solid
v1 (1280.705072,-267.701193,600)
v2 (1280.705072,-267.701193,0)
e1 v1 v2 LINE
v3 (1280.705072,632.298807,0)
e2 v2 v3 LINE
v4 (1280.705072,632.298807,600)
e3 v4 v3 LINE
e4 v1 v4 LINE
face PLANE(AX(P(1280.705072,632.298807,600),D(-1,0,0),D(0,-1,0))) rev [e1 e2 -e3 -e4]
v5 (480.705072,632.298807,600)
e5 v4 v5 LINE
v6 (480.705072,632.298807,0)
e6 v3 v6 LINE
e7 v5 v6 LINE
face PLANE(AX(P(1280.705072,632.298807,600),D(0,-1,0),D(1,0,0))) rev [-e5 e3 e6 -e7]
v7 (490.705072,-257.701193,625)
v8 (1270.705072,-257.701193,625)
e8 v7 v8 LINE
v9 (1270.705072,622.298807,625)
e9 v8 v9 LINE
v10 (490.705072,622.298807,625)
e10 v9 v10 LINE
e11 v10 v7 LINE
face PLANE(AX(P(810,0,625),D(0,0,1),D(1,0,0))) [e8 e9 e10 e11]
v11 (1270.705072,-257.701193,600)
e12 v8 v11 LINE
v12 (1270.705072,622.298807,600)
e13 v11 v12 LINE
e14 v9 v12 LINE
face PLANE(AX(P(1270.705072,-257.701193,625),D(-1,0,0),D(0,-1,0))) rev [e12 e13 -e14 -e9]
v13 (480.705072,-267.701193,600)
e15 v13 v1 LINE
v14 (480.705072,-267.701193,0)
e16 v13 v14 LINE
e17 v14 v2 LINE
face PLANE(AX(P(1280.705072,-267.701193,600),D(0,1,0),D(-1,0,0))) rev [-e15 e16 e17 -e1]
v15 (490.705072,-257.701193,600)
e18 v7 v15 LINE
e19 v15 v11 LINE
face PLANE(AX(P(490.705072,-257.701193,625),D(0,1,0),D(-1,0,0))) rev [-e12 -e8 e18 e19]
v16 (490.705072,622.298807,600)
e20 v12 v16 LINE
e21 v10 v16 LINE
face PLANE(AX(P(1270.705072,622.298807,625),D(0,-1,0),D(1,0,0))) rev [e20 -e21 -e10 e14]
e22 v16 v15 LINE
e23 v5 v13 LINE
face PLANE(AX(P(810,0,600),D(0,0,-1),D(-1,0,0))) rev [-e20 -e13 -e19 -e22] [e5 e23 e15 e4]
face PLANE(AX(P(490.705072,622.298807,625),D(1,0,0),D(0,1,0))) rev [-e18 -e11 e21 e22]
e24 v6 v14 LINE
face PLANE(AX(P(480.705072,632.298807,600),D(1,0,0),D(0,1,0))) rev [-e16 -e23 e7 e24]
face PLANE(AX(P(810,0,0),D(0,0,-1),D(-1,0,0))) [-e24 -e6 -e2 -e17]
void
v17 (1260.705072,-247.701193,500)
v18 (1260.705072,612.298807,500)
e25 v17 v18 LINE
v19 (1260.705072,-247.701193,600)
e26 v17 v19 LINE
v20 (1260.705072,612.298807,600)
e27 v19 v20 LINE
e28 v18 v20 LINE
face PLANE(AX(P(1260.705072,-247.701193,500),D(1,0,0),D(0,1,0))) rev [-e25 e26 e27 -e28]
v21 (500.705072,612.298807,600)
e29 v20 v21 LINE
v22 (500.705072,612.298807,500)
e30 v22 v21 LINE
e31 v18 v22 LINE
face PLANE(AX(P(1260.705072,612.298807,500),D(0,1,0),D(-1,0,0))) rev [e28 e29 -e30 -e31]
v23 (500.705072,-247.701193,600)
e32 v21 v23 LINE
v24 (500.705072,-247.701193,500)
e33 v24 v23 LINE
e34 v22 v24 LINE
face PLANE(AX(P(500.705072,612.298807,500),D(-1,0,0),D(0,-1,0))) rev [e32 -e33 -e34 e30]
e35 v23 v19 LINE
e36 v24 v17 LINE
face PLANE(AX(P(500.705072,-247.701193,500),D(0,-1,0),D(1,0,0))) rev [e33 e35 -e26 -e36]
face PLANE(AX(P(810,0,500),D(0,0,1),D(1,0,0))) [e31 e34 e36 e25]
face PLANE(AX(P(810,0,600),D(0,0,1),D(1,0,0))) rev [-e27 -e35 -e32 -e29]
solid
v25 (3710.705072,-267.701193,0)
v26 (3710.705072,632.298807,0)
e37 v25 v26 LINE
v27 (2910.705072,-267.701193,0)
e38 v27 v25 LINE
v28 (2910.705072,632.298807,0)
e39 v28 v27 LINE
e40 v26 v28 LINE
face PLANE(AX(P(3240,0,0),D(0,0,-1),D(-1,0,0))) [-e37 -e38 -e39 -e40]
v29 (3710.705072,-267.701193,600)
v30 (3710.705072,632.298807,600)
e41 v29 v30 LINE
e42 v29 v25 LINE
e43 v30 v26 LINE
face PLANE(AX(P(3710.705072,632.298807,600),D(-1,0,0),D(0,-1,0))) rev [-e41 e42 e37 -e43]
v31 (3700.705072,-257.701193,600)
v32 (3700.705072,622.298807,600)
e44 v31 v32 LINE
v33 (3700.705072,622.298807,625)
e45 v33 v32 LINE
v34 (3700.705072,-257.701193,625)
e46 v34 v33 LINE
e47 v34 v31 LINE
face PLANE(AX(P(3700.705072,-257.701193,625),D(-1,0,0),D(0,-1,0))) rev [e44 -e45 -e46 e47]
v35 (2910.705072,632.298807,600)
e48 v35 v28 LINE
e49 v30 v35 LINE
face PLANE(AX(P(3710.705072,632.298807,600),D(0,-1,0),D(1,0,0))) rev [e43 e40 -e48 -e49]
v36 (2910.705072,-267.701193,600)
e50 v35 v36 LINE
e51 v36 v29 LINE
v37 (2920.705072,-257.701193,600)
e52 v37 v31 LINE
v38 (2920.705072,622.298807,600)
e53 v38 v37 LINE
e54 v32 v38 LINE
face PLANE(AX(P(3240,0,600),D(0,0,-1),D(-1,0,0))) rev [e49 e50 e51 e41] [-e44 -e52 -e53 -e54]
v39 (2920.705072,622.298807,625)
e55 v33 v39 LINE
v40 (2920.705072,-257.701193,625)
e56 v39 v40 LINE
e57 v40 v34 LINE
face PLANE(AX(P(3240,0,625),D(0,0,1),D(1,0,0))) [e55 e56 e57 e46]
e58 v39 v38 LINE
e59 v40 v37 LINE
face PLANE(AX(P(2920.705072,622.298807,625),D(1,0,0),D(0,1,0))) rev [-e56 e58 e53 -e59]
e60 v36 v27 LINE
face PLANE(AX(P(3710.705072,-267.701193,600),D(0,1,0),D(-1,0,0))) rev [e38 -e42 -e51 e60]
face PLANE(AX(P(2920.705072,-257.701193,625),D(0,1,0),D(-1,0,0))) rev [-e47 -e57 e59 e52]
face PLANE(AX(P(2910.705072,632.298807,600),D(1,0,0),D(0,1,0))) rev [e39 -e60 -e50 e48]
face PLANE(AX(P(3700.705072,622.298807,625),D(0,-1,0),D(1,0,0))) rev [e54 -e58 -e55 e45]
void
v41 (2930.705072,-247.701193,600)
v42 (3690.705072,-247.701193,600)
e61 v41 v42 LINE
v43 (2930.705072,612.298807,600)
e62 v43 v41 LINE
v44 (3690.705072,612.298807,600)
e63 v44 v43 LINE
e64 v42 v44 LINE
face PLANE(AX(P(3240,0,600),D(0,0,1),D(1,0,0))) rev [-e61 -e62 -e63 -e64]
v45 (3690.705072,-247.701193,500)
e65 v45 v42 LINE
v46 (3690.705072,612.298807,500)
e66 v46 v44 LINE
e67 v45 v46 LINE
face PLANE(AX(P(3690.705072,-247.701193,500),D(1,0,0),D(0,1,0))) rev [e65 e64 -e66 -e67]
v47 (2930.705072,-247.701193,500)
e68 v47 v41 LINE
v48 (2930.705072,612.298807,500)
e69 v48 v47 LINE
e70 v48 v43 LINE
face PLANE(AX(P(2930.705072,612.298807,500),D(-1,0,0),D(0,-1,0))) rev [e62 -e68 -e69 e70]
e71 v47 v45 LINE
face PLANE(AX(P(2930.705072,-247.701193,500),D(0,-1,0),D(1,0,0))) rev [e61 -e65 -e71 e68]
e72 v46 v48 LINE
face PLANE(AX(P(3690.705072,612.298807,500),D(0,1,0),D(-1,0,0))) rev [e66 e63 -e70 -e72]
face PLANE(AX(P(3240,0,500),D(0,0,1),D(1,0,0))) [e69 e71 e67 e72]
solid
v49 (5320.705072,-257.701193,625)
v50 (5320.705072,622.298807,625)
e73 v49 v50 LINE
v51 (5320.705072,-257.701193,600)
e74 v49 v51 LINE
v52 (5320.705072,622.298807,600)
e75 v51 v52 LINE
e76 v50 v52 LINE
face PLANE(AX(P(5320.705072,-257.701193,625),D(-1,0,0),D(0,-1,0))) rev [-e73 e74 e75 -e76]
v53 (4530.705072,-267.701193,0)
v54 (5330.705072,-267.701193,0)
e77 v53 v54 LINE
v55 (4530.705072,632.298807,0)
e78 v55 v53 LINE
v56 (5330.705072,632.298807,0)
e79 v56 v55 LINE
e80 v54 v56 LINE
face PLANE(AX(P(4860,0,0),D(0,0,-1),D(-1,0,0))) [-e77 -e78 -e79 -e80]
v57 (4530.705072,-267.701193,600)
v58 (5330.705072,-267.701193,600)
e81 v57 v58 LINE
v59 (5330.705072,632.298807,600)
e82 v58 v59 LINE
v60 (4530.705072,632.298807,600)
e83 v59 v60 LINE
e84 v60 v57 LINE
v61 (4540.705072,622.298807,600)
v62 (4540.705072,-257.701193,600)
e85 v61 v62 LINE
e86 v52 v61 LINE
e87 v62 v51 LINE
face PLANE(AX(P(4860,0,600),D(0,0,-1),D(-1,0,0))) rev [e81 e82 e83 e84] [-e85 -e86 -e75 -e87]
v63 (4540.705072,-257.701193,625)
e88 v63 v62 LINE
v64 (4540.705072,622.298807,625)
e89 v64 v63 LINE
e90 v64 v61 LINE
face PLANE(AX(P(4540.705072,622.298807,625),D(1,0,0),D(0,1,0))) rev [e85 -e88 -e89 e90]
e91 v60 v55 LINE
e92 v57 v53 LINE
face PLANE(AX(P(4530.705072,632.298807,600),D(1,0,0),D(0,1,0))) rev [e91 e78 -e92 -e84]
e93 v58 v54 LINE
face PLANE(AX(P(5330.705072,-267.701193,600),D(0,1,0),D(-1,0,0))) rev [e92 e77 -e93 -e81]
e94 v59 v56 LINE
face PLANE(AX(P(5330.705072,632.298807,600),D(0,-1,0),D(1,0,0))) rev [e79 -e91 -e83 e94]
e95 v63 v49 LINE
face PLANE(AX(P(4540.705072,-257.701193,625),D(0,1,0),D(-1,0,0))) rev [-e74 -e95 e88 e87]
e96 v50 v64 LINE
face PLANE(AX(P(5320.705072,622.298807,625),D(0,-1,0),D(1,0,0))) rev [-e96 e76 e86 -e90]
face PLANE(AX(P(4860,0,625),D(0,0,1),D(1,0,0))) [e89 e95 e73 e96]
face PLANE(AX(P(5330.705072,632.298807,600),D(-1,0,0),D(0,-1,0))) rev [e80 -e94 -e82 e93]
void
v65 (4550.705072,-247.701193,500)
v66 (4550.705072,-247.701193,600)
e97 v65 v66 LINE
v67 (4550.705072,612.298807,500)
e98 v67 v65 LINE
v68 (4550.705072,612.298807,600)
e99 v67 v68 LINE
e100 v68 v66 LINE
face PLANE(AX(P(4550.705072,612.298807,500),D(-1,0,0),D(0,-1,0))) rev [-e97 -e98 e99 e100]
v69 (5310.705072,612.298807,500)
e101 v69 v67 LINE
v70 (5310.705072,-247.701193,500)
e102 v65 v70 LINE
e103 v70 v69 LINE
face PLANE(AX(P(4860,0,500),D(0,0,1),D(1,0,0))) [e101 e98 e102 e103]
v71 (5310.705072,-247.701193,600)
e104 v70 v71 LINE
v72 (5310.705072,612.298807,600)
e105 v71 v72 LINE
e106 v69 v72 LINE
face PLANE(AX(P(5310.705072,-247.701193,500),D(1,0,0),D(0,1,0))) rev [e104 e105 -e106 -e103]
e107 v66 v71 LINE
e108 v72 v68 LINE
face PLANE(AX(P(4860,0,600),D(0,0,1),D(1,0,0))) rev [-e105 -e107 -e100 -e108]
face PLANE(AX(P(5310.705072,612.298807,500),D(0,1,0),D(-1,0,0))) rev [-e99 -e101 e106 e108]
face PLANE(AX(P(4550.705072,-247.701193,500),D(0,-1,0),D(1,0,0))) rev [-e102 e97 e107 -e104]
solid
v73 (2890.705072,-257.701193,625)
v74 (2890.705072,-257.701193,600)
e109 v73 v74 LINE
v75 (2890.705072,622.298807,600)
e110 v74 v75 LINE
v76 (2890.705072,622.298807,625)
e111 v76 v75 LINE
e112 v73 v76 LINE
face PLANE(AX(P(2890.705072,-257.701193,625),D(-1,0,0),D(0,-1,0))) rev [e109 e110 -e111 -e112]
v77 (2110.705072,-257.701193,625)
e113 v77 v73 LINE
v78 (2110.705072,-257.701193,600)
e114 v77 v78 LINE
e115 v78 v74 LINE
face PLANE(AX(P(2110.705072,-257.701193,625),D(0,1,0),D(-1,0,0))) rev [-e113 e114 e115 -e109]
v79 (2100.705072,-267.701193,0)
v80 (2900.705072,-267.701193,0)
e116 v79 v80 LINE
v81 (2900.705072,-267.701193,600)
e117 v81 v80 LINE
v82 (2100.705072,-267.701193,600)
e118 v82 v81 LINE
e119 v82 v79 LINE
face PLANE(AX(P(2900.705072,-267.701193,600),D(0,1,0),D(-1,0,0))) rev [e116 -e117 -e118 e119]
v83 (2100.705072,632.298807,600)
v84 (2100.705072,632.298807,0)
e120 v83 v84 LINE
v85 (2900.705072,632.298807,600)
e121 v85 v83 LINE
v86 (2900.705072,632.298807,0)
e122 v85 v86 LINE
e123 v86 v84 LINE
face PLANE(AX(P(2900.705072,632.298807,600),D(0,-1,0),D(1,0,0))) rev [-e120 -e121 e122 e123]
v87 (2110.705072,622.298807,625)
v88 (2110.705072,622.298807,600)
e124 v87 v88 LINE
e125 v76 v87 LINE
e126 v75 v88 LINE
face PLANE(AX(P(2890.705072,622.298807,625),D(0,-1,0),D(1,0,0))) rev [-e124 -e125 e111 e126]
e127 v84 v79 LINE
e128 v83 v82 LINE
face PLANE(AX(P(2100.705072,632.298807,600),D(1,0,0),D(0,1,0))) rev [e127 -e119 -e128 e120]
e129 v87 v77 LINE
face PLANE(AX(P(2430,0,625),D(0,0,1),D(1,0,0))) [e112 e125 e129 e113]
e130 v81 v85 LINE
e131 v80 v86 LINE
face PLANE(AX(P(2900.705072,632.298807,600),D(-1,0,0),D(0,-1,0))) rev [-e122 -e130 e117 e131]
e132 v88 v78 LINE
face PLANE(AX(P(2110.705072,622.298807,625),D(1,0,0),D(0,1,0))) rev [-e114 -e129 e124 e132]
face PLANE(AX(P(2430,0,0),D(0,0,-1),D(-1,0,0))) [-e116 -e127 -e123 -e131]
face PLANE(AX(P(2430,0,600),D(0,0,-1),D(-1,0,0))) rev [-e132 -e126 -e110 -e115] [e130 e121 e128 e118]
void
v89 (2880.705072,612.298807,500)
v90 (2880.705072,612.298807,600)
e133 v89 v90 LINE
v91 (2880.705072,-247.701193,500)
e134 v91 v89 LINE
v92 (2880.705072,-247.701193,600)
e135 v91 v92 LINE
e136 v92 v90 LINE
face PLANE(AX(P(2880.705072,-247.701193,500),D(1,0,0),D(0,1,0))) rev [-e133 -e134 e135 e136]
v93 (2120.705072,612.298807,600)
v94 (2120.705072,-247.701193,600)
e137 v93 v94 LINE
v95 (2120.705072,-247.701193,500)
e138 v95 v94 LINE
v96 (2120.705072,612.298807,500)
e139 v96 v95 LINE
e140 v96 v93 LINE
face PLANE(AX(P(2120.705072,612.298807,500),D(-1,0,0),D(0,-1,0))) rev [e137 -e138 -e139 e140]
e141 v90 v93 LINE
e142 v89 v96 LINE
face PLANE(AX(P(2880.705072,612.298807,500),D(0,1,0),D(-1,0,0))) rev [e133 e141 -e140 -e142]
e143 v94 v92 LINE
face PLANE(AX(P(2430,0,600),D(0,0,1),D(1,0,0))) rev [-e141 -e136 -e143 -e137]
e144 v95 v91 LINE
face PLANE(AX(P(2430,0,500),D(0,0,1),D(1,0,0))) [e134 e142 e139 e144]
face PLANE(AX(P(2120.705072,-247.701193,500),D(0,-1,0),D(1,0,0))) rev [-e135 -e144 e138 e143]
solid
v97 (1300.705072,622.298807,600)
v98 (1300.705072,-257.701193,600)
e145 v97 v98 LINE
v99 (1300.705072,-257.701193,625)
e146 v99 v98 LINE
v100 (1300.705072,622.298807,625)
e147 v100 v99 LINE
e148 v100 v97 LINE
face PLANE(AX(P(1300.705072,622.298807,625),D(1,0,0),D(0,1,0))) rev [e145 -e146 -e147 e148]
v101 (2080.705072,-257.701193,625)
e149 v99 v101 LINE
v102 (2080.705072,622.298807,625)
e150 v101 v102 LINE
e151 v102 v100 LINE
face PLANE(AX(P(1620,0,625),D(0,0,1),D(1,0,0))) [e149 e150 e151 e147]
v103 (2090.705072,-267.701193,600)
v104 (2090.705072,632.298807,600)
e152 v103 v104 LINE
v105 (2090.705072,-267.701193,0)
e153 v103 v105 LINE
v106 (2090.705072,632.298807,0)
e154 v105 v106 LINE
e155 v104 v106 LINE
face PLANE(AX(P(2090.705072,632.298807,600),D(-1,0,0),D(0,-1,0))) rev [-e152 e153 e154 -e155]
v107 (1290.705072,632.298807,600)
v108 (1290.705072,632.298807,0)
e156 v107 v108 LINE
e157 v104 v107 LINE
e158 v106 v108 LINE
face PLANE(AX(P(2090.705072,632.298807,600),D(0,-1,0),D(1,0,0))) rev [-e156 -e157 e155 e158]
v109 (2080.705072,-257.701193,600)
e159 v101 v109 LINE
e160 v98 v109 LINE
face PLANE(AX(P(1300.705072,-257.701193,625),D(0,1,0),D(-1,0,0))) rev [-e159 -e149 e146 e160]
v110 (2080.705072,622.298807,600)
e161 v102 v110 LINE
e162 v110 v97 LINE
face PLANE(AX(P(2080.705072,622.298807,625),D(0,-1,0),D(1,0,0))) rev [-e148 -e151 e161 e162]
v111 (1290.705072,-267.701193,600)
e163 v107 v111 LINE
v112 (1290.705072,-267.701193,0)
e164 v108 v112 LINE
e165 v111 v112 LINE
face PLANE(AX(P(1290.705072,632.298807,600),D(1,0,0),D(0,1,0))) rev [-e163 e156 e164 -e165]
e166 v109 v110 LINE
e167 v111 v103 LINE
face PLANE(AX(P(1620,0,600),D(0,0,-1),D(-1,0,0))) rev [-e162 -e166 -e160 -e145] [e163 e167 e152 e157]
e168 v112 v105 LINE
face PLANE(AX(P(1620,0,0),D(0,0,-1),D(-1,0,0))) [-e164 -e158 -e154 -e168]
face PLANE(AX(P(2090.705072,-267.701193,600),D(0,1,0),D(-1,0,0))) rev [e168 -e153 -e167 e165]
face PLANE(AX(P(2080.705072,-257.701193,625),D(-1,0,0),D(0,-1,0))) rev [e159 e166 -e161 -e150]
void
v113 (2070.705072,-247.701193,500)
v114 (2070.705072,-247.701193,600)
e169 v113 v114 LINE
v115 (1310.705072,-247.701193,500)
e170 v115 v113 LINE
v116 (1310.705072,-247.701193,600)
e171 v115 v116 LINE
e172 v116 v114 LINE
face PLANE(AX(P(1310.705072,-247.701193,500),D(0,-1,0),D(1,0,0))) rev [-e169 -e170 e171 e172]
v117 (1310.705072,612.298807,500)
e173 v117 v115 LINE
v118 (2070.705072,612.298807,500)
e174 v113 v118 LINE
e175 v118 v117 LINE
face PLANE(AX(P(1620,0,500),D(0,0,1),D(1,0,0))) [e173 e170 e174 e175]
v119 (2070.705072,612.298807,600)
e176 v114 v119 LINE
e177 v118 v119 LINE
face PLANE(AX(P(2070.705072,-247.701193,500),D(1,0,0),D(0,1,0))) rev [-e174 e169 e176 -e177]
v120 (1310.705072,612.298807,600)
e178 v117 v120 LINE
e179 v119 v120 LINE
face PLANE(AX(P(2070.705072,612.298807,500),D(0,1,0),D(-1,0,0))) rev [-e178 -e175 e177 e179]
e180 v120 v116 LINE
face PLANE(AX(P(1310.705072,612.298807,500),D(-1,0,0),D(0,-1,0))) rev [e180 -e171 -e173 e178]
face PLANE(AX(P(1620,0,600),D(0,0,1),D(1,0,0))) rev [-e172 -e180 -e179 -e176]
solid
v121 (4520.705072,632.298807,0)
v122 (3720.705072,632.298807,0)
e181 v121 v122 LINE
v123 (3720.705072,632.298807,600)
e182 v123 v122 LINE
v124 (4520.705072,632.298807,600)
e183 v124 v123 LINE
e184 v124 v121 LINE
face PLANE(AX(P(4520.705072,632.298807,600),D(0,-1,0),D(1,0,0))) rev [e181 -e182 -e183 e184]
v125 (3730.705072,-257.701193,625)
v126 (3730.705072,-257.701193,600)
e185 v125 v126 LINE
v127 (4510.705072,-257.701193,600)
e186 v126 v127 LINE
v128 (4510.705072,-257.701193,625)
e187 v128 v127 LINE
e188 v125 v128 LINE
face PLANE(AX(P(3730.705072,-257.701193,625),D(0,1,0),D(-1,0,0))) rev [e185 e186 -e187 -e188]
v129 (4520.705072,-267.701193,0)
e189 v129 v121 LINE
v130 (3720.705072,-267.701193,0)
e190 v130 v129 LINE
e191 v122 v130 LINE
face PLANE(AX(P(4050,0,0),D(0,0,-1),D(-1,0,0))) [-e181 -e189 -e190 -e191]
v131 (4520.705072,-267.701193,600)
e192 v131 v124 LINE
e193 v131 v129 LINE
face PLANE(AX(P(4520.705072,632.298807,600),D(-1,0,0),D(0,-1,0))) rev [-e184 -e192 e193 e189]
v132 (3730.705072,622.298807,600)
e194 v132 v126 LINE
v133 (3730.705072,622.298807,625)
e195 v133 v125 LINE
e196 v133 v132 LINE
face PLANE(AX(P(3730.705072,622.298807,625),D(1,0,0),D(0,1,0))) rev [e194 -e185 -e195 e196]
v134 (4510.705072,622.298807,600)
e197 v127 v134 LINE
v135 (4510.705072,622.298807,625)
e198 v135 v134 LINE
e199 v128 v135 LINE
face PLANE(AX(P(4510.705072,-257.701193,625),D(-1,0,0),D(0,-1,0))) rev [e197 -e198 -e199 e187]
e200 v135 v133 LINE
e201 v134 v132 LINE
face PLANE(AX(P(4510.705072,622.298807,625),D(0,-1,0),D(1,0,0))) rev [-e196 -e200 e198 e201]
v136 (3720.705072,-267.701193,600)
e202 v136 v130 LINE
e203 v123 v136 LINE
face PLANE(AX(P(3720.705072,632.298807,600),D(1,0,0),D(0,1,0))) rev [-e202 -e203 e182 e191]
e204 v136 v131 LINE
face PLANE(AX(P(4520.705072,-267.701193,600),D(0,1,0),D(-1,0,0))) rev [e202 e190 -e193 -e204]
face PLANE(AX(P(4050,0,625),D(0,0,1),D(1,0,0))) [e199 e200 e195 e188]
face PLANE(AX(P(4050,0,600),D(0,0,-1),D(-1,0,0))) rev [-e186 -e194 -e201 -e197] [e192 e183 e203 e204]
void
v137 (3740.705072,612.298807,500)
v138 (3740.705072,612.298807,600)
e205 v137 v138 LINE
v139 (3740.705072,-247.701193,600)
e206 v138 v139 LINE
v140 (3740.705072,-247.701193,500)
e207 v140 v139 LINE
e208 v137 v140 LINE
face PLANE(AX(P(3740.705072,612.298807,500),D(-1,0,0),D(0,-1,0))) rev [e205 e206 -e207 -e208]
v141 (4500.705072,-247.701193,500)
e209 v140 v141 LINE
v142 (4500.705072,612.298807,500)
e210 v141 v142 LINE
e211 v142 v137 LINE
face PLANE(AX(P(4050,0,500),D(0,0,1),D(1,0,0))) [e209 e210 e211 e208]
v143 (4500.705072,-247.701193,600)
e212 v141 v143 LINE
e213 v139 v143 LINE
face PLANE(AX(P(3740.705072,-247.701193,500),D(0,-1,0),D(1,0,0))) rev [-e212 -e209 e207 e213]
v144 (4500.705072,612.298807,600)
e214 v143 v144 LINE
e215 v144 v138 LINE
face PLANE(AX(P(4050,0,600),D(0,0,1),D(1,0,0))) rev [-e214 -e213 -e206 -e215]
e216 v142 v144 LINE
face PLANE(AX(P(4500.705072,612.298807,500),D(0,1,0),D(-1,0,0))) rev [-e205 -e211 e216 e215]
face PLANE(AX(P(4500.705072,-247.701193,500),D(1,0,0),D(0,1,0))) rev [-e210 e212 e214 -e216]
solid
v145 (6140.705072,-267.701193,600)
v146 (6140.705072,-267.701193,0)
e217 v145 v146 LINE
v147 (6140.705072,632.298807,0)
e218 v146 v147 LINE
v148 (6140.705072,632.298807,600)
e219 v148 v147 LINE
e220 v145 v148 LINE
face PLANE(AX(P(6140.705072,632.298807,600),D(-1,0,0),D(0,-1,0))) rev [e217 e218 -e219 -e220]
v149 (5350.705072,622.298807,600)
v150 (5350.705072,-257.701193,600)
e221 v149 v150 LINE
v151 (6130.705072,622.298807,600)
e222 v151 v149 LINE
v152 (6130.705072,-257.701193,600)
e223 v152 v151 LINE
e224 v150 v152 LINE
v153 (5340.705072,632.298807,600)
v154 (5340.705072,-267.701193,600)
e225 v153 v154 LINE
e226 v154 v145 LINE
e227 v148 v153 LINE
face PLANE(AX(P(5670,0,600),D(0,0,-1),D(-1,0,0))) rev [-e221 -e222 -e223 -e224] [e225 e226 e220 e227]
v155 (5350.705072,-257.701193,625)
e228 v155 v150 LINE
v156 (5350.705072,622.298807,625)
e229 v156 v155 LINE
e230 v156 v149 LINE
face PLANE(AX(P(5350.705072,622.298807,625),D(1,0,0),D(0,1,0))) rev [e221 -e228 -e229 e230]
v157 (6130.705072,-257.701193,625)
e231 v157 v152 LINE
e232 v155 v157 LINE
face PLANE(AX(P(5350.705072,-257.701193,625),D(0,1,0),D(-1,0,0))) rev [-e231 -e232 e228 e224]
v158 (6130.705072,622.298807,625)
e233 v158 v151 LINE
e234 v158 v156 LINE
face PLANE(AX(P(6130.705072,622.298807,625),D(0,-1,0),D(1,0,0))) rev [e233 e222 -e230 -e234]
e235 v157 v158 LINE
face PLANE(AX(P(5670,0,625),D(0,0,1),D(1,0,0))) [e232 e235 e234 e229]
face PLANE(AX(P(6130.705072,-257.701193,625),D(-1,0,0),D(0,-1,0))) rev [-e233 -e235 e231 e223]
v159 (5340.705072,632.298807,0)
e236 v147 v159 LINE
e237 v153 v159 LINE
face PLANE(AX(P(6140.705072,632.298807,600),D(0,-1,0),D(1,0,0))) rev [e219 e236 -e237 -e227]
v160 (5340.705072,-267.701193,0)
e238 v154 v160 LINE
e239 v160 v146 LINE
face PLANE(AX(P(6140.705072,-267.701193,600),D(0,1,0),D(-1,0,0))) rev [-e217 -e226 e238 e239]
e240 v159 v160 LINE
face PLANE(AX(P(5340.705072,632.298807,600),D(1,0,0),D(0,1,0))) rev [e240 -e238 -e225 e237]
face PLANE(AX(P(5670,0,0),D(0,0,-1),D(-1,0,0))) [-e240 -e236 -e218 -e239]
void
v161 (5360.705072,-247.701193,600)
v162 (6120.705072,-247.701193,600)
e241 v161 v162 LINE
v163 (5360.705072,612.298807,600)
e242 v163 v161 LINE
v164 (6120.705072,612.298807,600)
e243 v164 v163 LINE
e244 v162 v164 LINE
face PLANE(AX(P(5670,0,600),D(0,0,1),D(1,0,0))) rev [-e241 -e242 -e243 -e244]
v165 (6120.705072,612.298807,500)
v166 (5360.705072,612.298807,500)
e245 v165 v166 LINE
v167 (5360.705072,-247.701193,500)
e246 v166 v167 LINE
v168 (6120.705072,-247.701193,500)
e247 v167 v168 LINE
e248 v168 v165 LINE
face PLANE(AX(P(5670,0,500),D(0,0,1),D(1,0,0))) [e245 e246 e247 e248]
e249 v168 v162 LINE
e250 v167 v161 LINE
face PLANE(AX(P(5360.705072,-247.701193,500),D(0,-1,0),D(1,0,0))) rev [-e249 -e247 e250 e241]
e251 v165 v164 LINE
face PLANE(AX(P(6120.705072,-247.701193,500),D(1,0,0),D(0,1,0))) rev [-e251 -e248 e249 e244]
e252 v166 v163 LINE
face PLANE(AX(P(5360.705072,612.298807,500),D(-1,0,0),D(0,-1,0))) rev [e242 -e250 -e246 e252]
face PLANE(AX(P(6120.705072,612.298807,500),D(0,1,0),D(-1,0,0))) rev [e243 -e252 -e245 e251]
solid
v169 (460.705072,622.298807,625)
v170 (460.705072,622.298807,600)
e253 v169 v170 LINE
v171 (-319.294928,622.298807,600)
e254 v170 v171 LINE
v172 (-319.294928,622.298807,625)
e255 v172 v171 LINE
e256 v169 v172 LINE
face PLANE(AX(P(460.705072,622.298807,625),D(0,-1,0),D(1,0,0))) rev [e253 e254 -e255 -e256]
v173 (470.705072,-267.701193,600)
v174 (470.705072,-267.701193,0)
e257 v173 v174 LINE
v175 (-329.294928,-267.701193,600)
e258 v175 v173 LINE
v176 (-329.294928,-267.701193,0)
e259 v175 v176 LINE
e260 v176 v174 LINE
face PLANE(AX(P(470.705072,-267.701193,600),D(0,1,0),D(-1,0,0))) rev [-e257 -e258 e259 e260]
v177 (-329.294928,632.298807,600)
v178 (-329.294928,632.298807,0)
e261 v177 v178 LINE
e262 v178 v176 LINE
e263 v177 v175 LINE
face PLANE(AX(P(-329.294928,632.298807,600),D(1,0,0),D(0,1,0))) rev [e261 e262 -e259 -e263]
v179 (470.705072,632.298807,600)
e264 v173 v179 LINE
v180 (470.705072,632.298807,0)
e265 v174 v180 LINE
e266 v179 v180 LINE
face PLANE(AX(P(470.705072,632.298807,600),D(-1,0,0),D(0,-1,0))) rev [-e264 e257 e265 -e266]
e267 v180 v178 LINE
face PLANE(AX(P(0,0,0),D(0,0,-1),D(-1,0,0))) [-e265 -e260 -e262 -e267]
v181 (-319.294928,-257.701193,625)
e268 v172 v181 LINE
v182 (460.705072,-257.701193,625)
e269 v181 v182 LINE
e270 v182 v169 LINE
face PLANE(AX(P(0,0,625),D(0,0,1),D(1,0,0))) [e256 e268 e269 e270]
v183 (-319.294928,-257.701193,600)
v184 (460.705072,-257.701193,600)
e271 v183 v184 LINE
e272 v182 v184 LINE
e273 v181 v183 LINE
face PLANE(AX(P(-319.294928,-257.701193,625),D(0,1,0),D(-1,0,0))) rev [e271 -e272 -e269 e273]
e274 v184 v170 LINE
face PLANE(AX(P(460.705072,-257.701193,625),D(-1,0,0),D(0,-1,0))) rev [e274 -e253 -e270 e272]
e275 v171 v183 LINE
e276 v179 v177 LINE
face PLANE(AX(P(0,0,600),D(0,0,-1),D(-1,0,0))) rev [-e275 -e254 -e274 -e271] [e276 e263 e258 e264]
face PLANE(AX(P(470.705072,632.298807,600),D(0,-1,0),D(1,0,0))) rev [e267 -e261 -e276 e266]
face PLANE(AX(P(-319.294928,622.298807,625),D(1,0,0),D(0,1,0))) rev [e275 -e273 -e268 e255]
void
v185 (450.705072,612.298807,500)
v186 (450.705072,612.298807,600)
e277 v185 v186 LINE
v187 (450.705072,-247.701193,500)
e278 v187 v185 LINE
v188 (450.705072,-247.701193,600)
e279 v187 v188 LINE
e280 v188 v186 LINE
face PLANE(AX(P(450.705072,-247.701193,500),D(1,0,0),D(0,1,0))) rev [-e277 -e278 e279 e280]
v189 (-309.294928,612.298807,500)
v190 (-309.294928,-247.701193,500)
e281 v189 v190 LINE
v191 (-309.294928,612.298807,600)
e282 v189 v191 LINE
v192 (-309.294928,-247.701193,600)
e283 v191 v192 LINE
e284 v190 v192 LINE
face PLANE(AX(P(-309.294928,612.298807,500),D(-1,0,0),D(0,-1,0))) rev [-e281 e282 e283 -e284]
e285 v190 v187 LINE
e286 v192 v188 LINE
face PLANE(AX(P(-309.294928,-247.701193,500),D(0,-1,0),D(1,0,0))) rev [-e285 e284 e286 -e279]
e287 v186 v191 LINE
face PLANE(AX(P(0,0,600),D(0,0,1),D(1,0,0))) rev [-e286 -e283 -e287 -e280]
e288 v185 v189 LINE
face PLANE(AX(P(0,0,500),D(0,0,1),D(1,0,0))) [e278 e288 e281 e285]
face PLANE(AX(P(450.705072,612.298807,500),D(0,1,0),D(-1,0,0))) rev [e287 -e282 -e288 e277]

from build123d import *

# Parameters (mm, degrees)
SKETCH5_W           = 800
SKETCH5_H           = 900
BOSS_EXTRUDE7_DEPTH = 600
SKETCH6_W           = 760
SKETCH6_H           = 860
CUT_EXTRUDE3_DEPTH  = 100
SKETCH10_W          = 780
SKETCH10_H          = 880
BOSS_EXTRUDE8_DEPTH = 25


with BuildPart() as part:
    # Sketch5 → Boss-Extrude7 (new body)
    with BuildSketch(Plane.XY):
        with Locations((70.705071793, 182.298806907)):
            Rectangle(SKETCH5_W, SKETCH5_H)
    extrude(amount=BOSS_EXTRUDE7_DEPTH)

    # Sketch6 → Cut-Extrude3 (cut)
    with BuildSketch(Plane.XY.offset(600)):
        with Locations((70.705071793, 182.298806907)):
            Rectangle(SKETCH6_W, SKETCH6_H)
    extrude(amount=-CUT_EXTRUDE3_DEPTH, mode=Mode.SUBTRACT)

    # Sketch10 → Boss-Extrude8 (add)
    with BuildSketch(Plane.XY.offset(600)):
        with Locations((70.705071793, 182.298806907)):
            Rectangle(SKETCH10_W, SKETCH10_H)
    extrude(amount=BOSS_EXTRUDE8_DEPTH)


with BuildPart() as body_2:
    # Body-Move/Copy2: read off the stored shape, not the designer's step
    # Body-Move/Copy2: copy of part
    add(part.part.moved(Location((5670, 0, 0))))


with BuildPart() as body_3:
    # Body-Move_Copy2 2: copy of part
    add(part.part.moved(Location((4860, 0, 0))))


with BuildPart() as body_4:
    # Body-Move_Copy2 3: copy of part
    add(part.part.moved(Location((4050, 0, 0))))


with BuildPart() as body_5:
    # Body-Move_Copy2 4: copy of part
    add(part.part.moved(Location((3240, 0, 0))))


with BuildPart() as body_6:
    # Body-Move_Copy2 5: copy of part
    add(part.part.moved(Location((2430, 0, 0))))


with BuildPart() as body_7:
    # Body-Move_Copy2 6: copy of part
    add(part.part.moved(Location((1620, 0, 0))))


with BuildPart() as body_8:
    # Body-Move_Copy2 7: copy of part
    add(part.part.moved(Location((810, 0, 0))))


with BuildPart() as body_9:
    # Body-Move_Copy2 8: copy of part
    add(part.part.moved(Location((7290, 0, 0))))


with BuildPart() as body_10:
    # Body-Move_Copy2 9: copy of part
    add(part.part.moved(Location((6480, 0, 0))))


solid = Compound([part.part, body_2.part, body_3.part, body_4.part, body_5.part, body_6.part, body_7.part, body_8.part])
